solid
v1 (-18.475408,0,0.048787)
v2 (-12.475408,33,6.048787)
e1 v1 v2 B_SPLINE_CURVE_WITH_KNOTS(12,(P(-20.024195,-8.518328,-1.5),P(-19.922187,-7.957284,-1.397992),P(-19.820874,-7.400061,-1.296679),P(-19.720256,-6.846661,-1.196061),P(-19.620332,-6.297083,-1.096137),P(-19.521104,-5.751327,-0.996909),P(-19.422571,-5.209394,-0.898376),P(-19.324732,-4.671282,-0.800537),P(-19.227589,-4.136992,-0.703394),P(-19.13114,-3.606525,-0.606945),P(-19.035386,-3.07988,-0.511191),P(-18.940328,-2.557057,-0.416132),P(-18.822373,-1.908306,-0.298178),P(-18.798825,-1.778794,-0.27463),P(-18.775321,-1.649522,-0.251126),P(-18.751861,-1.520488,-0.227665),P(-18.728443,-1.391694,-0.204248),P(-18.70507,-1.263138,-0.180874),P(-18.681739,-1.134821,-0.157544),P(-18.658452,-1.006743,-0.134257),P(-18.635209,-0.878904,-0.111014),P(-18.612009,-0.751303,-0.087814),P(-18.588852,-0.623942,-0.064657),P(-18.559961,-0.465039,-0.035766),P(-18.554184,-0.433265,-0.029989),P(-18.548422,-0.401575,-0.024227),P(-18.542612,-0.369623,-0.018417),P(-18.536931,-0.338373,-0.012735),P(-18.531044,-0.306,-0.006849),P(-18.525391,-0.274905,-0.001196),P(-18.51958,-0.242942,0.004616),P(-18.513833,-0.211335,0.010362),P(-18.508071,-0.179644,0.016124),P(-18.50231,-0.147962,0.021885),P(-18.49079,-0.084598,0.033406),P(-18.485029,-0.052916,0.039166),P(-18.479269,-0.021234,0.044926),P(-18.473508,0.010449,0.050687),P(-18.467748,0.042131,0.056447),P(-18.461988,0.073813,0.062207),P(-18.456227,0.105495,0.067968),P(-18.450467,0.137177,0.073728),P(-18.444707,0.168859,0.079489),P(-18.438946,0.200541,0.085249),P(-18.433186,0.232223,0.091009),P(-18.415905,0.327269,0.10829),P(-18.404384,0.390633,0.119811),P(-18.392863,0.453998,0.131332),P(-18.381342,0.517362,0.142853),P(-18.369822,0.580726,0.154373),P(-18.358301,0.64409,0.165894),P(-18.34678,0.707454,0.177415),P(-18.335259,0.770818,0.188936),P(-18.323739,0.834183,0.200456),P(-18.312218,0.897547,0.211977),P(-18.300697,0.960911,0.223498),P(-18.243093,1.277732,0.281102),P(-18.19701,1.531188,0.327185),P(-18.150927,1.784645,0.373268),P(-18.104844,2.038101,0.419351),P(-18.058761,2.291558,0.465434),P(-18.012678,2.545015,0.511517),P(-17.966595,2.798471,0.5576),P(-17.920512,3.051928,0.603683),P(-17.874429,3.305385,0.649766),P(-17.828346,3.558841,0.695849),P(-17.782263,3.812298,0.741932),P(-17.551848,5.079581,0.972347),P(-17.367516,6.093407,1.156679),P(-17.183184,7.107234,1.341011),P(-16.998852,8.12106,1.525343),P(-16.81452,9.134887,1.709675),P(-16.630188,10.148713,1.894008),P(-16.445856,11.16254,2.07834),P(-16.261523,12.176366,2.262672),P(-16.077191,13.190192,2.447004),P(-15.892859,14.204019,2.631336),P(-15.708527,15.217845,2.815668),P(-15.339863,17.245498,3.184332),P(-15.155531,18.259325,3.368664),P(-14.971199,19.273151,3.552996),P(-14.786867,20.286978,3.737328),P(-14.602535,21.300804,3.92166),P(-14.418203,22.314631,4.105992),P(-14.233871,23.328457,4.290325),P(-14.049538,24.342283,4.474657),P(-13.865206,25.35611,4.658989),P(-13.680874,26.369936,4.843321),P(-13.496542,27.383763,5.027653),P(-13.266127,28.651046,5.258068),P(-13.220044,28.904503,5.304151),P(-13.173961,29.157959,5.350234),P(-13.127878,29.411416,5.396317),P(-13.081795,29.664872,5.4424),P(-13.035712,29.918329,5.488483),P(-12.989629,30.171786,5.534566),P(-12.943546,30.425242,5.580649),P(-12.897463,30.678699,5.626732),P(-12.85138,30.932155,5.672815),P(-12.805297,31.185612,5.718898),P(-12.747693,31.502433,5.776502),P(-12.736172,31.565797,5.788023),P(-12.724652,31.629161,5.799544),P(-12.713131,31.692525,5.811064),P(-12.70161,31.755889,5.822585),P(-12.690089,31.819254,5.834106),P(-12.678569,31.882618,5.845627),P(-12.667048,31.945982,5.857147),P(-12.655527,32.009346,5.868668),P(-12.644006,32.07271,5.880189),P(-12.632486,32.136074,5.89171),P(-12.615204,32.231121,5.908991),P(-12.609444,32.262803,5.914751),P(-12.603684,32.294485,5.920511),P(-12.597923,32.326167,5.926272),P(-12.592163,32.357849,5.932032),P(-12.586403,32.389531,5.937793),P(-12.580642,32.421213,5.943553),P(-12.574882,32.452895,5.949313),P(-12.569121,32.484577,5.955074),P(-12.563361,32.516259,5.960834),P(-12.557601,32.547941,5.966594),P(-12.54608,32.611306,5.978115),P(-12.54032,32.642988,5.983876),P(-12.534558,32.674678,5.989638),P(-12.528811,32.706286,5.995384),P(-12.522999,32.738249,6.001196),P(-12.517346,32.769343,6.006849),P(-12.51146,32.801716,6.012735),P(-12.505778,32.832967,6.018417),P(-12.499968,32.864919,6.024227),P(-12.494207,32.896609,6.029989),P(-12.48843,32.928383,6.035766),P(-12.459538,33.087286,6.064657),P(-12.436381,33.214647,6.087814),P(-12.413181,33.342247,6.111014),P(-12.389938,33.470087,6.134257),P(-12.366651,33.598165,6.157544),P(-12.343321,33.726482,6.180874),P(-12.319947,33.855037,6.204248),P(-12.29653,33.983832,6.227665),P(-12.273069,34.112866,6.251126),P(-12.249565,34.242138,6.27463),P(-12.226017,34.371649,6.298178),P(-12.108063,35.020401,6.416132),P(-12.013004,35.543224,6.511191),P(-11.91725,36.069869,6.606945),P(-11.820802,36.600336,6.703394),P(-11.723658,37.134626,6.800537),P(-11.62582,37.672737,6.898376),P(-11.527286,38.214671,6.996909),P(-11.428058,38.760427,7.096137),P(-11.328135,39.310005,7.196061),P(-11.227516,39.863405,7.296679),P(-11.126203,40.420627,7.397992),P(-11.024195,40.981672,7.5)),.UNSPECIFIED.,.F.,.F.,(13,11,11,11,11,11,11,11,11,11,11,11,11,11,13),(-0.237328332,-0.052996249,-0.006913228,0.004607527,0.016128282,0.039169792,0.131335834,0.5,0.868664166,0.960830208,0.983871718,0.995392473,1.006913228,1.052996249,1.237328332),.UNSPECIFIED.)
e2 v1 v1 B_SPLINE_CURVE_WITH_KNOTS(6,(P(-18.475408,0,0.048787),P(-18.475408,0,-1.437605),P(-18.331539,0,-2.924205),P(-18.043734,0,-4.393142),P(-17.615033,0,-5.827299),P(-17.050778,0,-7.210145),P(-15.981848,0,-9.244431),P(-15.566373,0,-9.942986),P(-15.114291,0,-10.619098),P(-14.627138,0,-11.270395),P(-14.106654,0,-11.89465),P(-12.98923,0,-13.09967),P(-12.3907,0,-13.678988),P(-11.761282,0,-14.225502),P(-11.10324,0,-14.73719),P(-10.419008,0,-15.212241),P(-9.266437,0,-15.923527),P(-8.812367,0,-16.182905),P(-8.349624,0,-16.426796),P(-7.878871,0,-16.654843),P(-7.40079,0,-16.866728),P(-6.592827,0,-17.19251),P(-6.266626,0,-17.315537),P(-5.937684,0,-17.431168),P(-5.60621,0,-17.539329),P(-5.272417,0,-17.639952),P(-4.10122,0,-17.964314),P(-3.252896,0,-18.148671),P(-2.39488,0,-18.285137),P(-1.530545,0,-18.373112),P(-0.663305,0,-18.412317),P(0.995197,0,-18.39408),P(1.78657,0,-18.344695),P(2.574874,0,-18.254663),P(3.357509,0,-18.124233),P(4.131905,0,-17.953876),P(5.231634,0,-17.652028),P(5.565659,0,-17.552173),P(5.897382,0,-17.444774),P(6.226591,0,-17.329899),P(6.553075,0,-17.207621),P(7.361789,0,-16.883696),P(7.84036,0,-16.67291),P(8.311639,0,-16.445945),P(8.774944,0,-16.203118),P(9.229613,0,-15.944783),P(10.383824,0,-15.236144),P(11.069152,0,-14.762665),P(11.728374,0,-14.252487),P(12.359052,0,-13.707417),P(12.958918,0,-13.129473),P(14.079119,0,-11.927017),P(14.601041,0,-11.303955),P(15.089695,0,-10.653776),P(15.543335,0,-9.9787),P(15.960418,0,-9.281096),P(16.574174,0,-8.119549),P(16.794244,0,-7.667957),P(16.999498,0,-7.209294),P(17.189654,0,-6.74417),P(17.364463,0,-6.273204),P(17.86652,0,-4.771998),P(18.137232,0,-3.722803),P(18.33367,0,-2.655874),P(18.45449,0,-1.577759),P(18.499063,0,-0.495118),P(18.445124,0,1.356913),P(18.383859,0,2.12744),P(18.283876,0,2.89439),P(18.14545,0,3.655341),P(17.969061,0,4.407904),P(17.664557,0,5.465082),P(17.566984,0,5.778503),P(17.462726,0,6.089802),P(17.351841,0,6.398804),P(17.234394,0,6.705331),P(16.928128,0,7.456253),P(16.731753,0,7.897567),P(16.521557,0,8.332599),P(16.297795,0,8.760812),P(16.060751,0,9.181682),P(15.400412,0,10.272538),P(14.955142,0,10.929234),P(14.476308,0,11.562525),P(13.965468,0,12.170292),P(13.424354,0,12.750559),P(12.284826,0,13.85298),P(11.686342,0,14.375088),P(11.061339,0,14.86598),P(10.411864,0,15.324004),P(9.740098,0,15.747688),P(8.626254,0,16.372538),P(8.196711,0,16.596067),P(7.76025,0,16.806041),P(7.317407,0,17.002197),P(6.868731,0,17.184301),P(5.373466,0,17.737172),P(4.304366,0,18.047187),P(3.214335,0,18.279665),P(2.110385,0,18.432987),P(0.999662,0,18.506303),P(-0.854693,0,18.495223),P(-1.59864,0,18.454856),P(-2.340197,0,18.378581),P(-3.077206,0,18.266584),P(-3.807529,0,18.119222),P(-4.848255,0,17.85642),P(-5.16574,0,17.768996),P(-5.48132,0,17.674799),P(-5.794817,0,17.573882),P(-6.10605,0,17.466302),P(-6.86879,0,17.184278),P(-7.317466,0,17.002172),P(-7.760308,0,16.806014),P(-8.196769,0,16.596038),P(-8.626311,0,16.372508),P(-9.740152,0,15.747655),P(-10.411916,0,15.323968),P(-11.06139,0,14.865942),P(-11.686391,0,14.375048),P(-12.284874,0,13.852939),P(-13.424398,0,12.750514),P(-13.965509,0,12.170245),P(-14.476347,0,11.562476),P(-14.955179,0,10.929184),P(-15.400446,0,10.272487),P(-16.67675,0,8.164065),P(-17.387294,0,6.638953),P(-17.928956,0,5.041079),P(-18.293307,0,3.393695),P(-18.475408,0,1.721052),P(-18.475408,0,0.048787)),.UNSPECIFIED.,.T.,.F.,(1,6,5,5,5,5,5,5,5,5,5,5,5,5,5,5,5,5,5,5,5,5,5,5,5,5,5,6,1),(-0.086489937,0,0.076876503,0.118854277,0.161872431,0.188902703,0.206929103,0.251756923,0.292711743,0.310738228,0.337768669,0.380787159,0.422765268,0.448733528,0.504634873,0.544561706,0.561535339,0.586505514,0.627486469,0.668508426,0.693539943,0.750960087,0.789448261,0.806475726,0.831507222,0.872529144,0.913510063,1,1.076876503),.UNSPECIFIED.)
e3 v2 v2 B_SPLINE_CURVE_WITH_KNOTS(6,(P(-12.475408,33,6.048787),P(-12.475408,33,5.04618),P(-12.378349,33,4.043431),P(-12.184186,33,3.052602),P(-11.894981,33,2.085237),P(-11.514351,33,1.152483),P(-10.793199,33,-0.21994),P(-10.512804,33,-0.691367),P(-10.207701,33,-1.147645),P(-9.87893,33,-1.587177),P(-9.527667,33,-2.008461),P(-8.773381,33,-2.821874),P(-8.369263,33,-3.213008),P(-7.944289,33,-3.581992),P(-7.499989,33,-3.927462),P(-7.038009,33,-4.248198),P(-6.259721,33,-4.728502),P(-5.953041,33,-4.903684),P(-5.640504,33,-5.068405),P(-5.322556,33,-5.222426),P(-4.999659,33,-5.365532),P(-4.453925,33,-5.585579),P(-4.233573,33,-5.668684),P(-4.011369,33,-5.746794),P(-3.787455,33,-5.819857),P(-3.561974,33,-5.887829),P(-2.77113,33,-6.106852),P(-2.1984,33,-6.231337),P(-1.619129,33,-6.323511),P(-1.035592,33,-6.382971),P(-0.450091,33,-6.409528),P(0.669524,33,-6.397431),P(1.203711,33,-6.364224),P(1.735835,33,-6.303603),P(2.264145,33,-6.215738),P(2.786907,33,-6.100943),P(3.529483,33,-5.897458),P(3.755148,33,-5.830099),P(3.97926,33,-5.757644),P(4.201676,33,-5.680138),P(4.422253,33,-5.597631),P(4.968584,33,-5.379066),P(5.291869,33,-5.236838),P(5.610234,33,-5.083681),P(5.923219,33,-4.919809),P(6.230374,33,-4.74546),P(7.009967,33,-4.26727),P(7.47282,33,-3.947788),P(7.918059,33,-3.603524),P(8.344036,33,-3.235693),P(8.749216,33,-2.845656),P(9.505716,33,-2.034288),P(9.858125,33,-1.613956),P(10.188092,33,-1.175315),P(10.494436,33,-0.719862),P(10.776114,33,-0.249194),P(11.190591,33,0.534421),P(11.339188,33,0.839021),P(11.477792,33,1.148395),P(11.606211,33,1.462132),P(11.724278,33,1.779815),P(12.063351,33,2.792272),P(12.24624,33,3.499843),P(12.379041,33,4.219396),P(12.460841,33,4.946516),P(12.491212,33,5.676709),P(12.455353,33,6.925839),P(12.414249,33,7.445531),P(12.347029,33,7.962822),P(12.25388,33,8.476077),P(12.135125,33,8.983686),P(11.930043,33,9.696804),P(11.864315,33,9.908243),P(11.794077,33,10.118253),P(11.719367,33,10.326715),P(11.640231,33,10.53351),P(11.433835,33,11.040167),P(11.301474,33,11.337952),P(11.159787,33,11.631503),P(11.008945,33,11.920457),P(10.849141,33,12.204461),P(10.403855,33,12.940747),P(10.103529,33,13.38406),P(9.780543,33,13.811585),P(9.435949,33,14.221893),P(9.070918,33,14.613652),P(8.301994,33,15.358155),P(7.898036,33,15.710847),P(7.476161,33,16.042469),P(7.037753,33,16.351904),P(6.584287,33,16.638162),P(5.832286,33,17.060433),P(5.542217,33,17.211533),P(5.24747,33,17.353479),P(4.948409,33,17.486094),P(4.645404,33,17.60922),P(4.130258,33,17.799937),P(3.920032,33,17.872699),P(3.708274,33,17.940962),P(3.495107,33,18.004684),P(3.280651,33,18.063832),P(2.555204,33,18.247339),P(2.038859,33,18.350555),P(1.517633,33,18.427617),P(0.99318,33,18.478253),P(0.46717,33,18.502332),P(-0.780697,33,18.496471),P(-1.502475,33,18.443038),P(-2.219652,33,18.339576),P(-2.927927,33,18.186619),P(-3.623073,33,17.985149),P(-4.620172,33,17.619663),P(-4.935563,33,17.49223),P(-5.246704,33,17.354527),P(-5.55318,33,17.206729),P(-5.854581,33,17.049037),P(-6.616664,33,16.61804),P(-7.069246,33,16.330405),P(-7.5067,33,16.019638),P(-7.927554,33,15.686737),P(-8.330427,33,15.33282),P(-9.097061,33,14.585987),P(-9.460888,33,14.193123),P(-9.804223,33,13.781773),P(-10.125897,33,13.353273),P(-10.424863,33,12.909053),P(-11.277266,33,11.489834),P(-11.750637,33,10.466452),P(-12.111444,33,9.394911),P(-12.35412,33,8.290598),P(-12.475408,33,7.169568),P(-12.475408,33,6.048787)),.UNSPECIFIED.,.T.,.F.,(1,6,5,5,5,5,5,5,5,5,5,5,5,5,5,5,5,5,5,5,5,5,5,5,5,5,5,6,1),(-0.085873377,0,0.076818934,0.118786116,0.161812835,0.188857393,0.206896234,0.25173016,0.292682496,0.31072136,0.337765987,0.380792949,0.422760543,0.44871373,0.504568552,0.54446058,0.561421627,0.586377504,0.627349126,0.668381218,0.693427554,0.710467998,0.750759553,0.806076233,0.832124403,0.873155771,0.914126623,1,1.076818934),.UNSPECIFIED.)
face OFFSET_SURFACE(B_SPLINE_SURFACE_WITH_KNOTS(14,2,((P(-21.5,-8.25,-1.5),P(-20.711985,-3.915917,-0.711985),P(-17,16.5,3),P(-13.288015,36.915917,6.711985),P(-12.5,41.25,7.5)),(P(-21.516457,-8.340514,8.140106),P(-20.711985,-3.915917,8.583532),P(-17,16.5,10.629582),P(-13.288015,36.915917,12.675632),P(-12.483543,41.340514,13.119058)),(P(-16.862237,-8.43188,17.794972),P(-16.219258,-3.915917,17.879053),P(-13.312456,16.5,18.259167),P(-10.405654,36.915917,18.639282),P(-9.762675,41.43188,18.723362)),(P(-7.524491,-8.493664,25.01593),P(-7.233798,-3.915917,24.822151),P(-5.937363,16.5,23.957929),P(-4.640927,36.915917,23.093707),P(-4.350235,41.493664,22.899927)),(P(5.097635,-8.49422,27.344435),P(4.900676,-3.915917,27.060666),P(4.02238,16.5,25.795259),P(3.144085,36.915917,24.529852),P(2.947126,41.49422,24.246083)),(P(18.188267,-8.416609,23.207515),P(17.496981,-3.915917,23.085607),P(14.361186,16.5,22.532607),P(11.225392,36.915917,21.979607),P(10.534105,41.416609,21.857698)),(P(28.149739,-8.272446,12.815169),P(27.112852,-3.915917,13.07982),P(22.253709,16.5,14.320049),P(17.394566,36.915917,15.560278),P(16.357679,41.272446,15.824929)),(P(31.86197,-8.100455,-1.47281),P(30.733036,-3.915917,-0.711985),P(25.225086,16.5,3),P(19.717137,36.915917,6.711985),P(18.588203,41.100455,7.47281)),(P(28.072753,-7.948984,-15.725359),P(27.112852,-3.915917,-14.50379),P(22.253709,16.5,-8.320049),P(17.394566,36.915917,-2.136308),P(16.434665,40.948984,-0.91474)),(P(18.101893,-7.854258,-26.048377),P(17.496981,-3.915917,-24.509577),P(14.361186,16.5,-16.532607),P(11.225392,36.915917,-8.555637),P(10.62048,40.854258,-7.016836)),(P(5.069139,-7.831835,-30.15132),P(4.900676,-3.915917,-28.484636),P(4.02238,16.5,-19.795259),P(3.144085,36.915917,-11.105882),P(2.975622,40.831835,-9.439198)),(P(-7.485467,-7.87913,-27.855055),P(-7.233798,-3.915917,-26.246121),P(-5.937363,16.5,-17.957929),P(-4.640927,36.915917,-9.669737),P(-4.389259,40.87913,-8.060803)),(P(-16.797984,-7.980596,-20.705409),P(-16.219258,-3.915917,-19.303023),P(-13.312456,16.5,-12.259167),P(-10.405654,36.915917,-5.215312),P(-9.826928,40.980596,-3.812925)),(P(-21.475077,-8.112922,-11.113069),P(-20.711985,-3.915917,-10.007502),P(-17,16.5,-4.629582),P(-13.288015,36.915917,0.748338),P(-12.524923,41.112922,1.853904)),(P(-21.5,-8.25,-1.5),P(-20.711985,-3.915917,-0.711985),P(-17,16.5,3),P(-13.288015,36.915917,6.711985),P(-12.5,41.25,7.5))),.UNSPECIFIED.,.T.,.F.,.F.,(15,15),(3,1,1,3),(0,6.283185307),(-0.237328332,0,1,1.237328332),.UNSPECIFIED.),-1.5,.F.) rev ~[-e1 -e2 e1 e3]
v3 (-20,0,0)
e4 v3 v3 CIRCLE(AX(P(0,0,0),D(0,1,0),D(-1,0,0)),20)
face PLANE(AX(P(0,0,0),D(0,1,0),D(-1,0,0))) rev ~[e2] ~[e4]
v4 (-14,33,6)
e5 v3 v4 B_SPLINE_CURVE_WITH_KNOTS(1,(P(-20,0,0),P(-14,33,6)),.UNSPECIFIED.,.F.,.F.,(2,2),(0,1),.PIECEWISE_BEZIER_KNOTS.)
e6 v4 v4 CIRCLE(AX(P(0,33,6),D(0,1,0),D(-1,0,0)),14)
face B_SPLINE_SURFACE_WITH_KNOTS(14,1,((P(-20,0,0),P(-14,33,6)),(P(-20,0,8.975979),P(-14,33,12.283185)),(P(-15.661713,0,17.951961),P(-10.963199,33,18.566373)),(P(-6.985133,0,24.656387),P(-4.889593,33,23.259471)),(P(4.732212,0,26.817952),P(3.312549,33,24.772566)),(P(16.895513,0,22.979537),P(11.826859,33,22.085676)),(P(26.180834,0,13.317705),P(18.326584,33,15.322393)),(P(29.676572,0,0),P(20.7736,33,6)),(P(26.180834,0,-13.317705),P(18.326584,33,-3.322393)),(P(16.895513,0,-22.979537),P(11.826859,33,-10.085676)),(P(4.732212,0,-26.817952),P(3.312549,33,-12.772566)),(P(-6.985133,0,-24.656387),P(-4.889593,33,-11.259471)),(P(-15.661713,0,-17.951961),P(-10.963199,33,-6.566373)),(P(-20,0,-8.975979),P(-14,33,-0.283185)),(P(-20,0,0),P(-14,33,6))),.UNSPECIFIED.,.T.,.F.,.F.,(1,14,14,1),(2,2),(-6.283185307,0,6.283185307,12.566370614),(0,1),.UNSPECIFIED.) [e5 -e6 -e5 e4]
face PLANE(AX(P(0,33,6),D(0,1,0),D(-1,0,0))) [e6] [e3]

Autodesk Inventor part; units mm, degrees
ref_plane "YZ Plane" through (0, 0, 0) normal (1, 0, 0) x (0, 1, 0)
ref_plane "XY Plane" through (0, 0, 0) normal (0, 0, 1) x (1, 0, 0)
sketch "Szkic6" plane through (0, 0, 0) normal (0, 1, 0) x (-1, 0, 0)
  circle A0 centre (0, 0) radius 20
  dimension "d33" = 40
ref_plane "Płaszczyzna konstrukcyjna1" through (0, 33, 0) normal (0, 1, 0) x (-1, 0, 0)
sketch "Szkic7" plane through (0, 33, 0) normal (0, 1, 0) x (-1, 0, 0)
  circle A0 centre (0, 6) radius 14
  line L0 (0, -20.3) -> (0, 20.3) construction
  circle A1 centre (0, 0) radius 20 construction
  dimension "d35" = 28
loft "Wyciągnięcie złożone1" add profiles "Szkic6", "Szkic7"
shell "Skorupa1" thickness 1.5 removed faces 2 at (-0.5625, 33, 7.5565) at (2.364, 0, 6.2334)
equation "\"d33\" = OD1"
equation "\"d35\" = OD2"
equation "\"d52\" = THK"
equation "\"SzerokośćGięciaPodcięcia\" = Grubość"
equation "\"RozmiarPodcięciaNarożnika\" = 4 * Grubość"
equation "\"PromieńPrzejścia\" = PromieńGięcia"
equation "\"Rozmiar_promienia_Jacobiego\" = PromieńGięcia"
equation "\"Wielk_odstępu\" = Grubość"
equation "\"d2\" = PromieńGięcia"
equation "\"d23\" = PromieńGięcia"
equation "\"OD1\" = 40"
equation "\"OD2\" = 28"
equation "\"L\" = 33"
equation "\"THK\" = 1.5"
equation "\"d34\" = L"
equation "\"Grubość\" = 1.5"
equation "\"PromieńGięcia\" = 3"
properties part number "Redukcja asymetryczna Ø40x28x1,5 L=33" material "304"
